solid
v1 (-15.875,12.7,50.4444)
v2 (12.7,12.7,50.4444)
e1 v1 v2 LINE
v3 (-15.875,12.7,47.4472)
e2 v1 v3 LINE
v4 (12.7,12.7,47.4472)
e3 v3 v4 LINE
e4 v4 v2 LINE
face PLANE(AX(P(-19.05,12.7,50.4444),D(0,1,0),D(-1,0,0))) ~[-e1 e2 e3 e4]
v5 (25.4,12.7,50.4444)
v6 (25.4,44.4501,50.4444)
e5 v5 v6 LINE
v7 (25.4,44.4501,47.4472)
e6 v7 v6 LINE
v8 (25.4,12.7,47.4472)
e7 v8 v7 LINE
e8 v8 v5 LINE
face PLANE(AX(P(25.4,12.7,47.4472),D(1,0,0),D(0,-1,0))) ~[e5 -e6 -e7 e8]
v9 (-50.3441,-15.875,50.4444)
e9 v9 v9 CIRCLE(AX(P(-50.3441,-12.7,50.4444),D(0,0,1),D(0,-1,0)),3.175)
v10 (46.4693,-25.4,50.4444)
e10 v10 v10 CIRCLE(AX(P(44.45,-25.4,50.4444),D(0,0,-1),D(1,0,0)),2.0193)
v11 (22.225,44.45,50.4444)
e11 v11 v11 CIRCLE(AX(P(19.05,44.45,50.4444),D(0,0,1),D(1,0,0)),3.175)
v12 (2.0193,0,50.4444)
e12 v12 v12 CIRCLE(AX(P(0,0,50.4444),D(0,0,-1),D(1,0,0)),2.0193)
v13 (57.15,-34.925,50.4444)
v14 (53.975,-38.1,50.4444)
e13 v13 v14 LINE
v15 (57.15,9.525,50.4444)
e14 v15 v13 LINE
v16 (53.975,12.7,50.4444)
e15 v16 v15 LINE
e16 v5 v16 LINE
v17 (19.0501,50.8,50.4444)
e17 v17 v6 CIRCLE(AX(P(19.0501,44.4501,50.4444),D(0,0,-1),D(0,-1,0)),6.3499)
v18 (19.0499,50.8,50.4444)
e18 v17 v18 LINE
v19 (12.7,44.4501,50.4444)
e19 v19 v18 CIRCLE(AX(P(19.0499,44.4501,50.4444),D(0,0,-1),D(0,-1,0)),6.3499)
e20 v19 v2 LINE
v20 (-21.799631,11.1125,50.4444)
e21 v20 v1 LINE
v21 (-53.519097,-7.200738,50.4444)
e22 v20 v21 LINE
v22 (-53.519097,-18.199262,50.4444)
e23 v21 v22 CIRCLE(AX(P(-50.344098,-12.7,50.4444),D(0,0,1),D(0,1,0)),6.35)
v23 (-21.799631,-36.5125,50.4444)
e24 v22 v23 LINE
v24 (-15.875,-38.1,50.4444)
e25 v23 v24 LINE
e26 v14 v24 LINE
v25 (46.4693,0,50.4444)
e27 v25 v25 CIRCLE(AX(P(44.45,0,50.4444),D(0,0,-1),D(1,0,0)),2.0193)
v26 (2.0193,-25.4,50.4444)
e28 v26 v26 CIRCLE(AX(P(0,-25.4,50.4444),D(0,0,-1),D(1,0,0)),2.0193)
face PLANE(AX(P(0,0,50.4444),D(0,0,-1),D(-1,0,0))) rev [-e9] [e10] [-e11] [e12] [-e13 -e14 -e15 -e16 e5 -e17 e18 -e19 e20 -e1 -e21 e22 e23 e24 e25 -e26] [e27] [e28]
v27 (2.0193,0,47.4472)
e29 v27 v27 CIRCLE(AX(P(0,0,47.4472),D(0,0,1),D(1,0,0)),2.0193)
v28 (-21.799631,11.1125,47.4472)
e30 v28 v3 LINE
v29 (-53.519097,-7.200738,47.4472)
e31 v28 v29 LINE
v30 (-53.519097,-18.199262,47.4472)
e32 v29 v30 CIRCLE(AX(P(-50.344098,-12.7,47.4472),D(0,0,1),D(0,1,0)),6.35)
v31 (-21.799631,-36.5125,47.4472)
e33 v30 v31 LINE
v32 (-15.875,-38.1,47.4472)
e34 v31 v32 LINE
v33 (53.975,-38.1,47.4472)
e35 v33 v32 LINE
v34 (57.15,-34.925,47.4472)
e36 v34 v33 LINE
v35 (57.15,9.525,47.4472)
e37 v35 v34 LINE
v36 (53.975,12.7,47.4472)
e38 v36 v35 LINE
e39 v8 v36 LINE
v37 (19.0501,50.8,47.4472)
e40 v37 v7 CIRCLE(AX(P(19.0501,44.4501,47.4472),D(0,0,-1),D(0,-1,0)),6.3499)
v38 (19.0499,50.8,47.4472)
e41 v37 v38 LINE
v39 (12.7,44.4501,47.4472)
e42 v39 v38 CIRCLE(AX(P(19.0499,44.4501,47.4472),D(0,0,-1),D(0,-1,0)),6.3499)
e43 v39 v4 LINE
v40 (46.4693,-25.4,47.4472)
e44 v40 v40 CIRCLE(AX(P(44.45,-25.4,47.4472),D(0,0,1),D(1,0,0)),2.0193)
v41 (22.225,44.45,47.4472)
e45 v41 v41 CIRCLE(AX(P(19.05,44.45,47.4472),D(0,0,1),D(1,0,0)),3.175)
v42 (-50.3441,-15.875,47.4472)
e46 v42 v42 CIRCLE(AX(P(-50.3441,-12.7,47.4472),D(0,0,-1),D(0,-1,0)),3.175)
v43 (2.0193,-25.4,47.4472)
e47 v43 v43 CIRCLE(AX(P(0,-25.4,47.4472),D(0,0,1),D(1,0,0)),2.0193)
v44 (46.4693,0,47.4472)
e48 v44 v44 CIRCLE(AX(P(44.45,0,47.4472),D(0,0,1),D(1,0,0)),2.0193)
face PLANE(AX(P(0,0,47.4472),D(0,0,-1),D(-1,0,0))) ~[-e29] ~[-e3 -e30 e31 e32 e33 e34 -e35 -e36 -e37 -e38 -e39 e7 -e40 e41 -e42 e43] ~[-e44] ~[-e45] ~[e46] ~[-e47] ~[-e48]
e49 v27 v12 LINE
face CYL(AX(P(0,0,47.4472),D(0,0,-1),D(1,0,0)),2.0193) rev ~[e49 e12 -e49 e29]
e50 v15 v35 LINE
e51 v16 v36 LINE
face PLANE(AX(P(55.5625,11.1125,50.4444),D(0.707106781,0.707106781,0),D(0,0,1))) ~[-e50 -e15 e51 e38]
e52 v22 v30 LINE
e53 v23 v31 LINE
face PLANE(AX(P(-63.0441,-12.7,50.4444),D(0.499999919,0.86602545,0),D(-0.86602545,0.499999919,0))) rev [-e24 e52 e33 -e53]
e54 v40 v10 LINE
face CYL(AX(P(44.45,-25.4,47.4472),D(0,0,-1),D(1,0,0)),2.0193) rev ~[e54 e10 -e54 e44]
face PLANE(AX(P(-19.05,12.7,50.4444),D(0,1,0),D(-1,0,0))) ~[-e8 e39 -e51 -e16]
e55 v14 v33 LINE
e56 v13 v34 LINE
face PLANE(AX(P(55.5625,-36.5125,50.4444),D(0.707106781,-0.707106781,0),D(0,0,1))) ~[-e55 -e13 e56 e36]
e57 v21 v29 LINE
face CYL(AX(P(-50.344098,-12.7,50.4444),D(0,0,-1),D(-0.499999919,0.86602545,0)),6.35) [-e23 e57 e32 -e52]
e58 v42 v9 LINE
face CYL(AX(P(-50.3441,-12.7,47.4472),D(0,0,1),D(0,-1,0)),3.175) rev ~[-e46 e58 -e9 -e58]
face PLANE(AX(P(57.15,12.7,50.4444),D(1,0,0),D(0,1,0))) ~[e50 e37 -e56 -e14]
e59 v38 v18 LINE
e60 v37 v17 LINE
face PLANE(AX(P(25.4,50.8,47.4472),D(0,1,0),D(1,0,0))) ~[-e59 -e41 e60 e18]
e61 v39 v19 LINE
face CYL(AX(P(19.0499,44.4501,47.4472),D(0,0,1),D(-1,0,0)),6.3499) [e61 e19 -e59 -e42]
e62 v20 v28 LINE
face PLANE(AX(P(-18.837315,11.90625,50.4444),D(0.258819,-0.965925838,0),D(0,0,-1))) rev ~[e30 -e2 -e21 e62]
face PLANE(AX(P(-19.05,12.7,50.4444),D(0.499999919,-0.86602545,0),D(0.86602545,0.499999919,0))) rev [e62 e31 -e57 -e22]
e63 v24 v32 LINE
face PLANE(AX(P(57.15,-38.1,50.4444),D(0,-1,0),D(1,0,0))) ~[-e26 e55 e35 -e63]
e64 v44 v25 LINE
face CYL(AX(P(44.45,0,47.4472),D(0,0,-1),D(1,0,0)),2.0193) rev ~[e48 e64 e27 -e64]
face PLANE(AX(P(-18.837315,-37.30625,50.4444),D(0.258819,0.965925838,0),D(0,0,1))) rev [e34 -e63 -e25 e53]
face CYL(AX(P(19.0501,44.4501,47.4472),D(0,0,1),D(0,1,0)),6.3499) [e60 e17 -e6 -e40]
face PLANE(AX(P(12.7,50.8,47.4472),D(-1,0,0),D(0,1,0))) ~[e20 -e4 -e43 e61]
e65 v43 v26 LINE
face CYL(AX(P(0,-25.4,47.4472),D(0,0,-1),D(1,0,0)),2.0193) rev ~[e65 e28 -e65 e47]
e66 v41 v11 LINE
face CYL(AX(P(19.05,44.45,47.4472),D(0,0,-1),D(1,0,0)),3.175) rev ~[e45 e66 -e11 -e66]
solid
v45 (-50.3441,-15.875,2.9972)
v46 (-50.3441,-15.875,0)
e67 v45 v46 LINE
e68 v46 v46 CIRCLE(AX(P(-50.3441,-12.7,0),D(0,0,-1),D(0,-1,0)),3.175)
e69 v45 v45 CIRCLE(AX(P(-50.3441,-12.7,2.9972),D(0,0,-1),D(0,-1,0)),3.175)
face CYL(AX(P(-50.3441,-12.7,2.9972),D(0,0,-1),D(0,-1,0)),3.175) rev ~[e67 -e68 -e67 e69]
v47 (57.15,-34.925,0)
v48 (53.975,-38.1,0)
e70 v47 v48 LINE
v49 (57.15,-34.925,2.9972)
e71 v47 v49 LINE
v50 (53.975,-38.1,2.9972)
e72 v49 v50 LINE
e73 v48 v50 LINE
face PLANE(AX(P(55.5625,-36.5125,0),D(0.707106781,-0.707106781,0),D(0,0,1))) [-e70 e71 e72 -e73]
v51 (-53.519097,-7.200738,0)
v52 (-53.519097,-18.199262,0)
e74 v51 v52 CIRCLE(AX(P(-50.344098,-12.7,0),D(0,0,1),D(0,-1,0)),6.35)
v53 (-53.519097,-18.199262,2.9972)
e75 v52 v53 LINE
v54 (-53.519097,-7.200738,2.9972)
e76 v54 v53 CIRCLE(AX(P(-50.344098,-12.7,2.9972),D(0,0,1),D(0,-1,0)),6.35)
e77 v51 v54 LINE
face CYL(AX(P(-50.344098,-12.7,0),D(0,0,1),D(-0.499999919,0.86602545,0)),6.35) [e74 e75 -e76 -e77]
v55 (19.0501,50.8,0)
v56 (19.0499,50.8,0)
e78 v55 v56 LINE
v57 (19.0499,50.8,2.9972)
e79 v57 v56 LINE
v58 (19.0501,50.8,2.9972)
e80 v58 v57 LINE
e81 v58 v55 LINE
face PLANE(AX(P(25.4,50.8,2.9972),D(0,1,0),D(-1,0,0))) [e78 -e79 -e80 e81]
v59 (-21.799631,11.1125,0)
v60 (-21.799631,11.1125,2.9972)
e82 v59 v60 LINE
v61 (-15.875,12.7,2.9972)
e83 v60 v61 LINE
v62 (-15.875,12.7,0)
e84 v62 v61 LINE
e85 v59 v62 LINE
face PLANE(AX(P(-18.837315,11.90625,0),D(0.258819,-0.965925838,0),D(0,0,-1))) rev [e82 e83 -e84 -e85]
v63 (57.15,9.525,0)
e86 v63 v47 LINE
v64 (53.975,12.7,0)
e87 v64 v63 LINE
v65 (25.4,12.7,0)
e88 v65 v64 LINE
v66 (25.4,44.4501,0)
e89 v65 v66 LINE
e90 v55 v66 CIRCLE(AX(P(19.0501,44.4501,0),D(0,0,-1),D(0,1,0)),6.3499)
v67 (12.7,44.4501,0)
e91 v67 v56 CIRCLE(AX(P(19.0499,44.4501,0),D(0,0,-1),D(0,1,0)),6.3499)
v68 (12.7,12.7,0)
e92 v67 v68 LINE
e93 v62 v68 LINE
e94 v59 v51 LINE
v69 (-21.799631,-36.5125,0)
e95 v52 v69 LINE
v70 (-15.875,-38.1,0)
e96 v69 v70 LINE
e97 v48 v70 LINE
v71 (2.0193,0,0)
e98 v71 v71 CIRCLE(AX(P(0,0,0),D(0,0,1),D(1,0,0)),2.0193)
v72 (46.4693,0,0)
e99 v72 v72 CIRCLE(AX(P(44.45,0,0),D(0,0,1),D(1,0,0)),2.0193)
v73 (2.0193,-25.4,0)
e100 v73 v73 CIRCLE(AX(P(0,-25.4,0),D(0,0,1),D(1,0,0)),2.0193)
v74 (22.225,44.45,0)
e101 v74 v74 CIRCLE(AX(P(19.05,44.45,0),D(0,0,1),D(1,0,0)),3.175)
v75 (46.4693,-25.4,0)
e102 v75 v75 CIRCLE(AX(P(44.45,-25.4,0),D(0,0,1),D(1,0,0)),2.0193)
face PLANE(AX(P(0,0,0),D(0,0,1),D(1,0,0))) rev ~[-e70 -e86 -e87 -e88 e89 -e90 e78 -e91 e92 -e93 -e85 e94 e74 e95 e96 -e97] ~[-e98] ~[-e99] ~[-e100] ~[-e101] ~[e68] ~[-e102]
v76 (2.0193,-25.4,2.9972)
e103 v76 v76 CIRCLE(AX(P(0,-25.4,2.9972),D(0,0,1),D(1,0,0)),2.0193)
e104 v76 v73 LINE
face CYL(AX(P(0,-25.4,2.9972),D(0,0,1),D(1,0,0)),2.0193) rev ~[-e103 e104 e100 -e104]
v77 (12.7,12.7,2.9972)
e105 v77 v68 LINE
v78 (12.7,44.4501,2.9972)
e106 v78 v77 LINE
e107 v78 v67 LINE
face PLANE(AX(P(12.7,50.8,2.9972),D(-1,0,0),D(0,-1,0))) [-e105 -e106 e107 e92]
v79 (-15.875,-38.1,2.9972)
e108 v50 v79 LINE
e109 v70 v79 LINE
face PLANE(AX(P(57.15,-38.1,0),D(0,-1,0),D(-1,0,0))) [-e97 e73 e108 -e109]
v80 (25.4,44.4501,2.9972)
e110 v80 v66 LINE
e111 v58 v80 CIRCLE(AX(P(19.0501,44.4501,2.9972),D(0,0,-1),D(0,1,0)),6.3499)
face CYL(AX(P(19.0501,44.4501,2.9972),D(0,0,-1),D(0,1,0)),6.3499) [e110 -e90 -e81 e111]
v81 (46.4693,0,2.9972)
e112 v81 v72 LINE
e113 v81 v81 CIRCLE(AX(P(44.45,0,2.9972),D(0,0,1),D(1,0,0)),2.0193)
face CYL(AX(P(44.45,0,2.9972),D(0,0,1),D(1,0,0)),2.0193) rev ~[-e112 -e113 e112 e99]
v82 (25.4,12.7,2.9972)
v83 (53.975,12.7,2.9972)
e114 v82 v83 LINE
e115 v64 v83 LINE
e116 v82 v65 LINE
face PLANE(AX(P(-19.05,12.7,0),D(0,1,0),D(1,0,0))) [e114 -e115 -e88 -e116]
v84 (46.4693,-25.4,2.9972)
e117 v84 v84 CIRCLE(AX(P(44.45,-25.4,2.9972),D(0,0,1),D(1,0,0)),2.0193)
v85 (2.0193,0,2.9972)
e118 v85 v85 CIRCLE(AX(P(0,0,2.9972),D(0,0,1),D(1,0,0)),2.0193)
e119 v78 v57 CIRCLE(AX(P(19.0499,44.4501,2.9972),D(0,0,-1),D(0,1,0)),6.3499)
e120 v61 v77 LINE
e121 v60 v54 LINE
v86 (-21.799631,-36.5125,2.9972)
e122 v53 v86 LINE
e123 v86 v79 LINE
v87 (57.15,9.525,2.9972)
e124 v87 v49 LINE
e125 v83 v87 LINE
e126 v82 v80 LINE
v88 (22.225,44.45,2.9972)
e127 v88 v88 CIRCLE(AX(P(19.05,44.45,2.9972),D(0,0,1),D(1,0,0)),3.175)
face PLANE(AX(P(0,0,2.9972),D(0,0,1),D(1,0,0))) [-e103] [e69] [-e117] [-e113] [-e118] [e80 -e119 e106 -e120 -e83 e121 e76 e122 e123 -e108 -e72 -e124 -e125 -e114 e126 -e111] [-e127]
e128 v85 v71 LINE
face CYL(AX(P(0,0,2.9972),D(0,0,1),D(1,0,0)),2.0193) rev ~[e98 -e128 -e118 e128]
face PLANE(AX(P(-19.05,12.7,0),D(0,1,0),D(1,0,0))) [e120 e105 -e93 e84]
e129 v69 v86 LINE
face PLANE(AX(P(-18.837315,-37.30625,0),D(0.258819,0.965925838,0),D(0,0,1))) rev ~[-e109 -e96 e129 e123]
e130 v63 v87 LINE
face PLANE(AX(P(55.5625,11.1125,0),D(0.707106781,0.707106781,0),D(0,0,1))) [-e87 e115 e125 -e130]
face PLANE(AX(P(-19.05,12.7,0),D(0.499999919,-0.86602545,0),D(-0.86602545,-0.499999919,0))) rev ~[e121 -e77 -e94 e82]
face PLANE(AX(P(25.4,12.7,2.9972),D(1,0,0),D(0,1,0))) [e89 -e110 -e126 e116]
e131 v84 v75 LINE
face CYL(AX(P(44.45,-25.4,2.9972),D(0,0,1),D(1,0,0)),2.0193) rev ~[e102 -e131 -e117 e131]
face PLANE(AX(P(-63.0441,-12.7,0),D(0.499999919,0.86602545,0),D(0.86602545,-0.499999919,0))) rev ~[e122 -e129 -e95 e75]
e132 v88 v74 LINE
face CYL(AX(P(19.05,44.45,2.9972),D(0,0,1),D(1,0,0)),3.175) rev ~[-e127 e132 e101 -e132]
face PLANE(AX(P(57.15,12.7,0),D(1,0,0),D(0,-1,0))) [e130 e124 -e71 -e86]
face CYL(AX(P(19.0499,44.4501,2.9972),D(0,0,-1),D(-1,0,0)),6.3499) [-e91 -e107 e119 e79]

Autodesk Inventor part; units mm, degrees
ref_plane "YZ Plane" through (0, 0, 0) normal (1, 0, 0) x (0, 1, 0)
ref_plane "XZ Plane" through (0, 0, 0) normal (0, 1, 0) x (-1, 0, 0)
sketch "Sketch1" plane through (0, 0, 0) normal (0, 0, 1) x (1, 0, 0)
  line L0 (0, 0) -> (44.45, 0) construction
  line L1 (44.45, 0) -> (44.45, -25.4) construction
  line L2 (44.45, -25.4) -> (0, -25.4) construction
  line L3 (0, -25.4) -> (0, 0) construction
  line L4 (-19.05, 12.7) -> (57.15, 12.7)
  line L5 (57.15, 12.7) -> (57.15, -38.1)
  line L6 (57.15, -38.1) -> (-19.05, -38.1)
  line L7 (-19.05, 12.7) -> (-63.0441, -12.7)
  line L8 (-63.0441, -12.7) -> (-19.05, -38.1)
  line L9 (-19.05, 12.7) -> (-19.05, -38.1) construction
  dimension "d0" = 44.45
  dimension "d1" = 25.4
  dimension "d2" = 12.7
  dimension "d3" = 12.7
  dimension "d5" = 12.7
  dimension "d37" = 76.2
  dimension "d38" = 50.8
extrude "Extrusion1" add sketch "Sketch1" along normal blind 2.9972
sketch "Sketch2" plane through (0, 0, 2.9972) normal (0, 0, 1) x (1, 0, 0)
  line L0 (0, -25.4) -> (44.45, -25.4) construction
  line L1 (44.45, -25.4) -> (44.45, 0) construction
  line L2 (44.45, 0) -> (0, 0) construction
  line L3 (0, 0) -> (0, -25.4) construction
  line L4 (-19.05, -38.1) -> (57.15, -38.1) projected
  line L5 (57.15, -38.1) -> (57.15, 12.7) projected
  circle A0 centre (0, 0) radius 2.0193
  circle A1 centre (44.45, 0) radius 2.0193
  circle A2 centre (44.45, -25.4) radius 2.0193
  circle A3 centre (0, -25.4) radius 2.0193
  point P0 (0, 0)
  dimension "d8" = 12.7
  dimension "d9" = 25.4
  dimension "d10" = 12.7
  dimension "d11" = 44.45
  dimension "d12" = 4.0386
extrude "Extrusion2" cut sketch "Sketch2" against normal through all
fillet "Fillet1" radius 6.35 1 edges at (-63.0441, -12.7, 1.4986)
chamfer "Chamfer1" distance 3.175 angle 45 4 edges at (57.15, 12.7, 1.4986) (57.15, -38.1, 1.4986) (-19.05, 12.7, 1.4986) (-19.05, -38.1, 1.4986)
sketch "Sketch3" plane through (0, 0, 2.9972) normal (0, 0, 1) x (1, 0, 0)
  arc A0 (-53.5191, -7.2007) -> (-53.5191, -18.1993) centre (-50.3441, -12.7) ccw projected
  circle A1 centre (-50.3441, -12.7) radius 3.175
  point P0 (0, 0)
  dimension "d19" = 6.35
hole "Hole1" at (-50.3441, -12.7, 2.9972) direction (0, 0, -1) diameter 6.35 end through all
sketch "Sketch4" plane through (0, 0, 2.9972) normal (0, 0, 1) x (1, 0, 0)
  circle A0 centre (19.05, 44.45) radius 3.175
  line L0 (53.975, 12.7) -> (-15.875, 12.7) projected
  line L1 (12.7, 12.7) -> (25.4, 12.7)
  line L2 (25.4, 12.7) -> (25.4, 50.8)
  line L3 (25.4, 50.8) -> (12.7, 50.8)
  line L4 (12.7, 50.8) -> (12.7, 12.7)
  line L5 (57.15, -34.925) -> (57.15, 9.525) projected
  point P0 (0, 0)
  dimension "d27" = 6.35
  dimension "d28" = 6.35
  dimension "d29" = 12.7
  dimension "d30" = 6.35
  dimension "d31" = 31.75
  dimension "d32" = 38.1
extrude "Extrusion3" add sketch "Sketch4" against normal blind 2.9972
fillet "Fillet2" radius 6.35 2 edges at (12.7, 50.8, 1.4986) (25.4, 50.8, 1.4986)
ref_plane "Work Plane1" through (0, 0, 25.2222) normal (0, 0, 1) x (1, 0, 0)
mirror "Mirror1" about plane through (0, 0, 25.2222) normal (0, 0, 1) of "Extrusion1", "Extrusion2", "Fillet1", "Chamfer1", "Hole1", "Extrusion3", "Fillet2"
properties part number "Papa John Mounting Plate with hinge half 1" material "Polycarbonate, Clear"
